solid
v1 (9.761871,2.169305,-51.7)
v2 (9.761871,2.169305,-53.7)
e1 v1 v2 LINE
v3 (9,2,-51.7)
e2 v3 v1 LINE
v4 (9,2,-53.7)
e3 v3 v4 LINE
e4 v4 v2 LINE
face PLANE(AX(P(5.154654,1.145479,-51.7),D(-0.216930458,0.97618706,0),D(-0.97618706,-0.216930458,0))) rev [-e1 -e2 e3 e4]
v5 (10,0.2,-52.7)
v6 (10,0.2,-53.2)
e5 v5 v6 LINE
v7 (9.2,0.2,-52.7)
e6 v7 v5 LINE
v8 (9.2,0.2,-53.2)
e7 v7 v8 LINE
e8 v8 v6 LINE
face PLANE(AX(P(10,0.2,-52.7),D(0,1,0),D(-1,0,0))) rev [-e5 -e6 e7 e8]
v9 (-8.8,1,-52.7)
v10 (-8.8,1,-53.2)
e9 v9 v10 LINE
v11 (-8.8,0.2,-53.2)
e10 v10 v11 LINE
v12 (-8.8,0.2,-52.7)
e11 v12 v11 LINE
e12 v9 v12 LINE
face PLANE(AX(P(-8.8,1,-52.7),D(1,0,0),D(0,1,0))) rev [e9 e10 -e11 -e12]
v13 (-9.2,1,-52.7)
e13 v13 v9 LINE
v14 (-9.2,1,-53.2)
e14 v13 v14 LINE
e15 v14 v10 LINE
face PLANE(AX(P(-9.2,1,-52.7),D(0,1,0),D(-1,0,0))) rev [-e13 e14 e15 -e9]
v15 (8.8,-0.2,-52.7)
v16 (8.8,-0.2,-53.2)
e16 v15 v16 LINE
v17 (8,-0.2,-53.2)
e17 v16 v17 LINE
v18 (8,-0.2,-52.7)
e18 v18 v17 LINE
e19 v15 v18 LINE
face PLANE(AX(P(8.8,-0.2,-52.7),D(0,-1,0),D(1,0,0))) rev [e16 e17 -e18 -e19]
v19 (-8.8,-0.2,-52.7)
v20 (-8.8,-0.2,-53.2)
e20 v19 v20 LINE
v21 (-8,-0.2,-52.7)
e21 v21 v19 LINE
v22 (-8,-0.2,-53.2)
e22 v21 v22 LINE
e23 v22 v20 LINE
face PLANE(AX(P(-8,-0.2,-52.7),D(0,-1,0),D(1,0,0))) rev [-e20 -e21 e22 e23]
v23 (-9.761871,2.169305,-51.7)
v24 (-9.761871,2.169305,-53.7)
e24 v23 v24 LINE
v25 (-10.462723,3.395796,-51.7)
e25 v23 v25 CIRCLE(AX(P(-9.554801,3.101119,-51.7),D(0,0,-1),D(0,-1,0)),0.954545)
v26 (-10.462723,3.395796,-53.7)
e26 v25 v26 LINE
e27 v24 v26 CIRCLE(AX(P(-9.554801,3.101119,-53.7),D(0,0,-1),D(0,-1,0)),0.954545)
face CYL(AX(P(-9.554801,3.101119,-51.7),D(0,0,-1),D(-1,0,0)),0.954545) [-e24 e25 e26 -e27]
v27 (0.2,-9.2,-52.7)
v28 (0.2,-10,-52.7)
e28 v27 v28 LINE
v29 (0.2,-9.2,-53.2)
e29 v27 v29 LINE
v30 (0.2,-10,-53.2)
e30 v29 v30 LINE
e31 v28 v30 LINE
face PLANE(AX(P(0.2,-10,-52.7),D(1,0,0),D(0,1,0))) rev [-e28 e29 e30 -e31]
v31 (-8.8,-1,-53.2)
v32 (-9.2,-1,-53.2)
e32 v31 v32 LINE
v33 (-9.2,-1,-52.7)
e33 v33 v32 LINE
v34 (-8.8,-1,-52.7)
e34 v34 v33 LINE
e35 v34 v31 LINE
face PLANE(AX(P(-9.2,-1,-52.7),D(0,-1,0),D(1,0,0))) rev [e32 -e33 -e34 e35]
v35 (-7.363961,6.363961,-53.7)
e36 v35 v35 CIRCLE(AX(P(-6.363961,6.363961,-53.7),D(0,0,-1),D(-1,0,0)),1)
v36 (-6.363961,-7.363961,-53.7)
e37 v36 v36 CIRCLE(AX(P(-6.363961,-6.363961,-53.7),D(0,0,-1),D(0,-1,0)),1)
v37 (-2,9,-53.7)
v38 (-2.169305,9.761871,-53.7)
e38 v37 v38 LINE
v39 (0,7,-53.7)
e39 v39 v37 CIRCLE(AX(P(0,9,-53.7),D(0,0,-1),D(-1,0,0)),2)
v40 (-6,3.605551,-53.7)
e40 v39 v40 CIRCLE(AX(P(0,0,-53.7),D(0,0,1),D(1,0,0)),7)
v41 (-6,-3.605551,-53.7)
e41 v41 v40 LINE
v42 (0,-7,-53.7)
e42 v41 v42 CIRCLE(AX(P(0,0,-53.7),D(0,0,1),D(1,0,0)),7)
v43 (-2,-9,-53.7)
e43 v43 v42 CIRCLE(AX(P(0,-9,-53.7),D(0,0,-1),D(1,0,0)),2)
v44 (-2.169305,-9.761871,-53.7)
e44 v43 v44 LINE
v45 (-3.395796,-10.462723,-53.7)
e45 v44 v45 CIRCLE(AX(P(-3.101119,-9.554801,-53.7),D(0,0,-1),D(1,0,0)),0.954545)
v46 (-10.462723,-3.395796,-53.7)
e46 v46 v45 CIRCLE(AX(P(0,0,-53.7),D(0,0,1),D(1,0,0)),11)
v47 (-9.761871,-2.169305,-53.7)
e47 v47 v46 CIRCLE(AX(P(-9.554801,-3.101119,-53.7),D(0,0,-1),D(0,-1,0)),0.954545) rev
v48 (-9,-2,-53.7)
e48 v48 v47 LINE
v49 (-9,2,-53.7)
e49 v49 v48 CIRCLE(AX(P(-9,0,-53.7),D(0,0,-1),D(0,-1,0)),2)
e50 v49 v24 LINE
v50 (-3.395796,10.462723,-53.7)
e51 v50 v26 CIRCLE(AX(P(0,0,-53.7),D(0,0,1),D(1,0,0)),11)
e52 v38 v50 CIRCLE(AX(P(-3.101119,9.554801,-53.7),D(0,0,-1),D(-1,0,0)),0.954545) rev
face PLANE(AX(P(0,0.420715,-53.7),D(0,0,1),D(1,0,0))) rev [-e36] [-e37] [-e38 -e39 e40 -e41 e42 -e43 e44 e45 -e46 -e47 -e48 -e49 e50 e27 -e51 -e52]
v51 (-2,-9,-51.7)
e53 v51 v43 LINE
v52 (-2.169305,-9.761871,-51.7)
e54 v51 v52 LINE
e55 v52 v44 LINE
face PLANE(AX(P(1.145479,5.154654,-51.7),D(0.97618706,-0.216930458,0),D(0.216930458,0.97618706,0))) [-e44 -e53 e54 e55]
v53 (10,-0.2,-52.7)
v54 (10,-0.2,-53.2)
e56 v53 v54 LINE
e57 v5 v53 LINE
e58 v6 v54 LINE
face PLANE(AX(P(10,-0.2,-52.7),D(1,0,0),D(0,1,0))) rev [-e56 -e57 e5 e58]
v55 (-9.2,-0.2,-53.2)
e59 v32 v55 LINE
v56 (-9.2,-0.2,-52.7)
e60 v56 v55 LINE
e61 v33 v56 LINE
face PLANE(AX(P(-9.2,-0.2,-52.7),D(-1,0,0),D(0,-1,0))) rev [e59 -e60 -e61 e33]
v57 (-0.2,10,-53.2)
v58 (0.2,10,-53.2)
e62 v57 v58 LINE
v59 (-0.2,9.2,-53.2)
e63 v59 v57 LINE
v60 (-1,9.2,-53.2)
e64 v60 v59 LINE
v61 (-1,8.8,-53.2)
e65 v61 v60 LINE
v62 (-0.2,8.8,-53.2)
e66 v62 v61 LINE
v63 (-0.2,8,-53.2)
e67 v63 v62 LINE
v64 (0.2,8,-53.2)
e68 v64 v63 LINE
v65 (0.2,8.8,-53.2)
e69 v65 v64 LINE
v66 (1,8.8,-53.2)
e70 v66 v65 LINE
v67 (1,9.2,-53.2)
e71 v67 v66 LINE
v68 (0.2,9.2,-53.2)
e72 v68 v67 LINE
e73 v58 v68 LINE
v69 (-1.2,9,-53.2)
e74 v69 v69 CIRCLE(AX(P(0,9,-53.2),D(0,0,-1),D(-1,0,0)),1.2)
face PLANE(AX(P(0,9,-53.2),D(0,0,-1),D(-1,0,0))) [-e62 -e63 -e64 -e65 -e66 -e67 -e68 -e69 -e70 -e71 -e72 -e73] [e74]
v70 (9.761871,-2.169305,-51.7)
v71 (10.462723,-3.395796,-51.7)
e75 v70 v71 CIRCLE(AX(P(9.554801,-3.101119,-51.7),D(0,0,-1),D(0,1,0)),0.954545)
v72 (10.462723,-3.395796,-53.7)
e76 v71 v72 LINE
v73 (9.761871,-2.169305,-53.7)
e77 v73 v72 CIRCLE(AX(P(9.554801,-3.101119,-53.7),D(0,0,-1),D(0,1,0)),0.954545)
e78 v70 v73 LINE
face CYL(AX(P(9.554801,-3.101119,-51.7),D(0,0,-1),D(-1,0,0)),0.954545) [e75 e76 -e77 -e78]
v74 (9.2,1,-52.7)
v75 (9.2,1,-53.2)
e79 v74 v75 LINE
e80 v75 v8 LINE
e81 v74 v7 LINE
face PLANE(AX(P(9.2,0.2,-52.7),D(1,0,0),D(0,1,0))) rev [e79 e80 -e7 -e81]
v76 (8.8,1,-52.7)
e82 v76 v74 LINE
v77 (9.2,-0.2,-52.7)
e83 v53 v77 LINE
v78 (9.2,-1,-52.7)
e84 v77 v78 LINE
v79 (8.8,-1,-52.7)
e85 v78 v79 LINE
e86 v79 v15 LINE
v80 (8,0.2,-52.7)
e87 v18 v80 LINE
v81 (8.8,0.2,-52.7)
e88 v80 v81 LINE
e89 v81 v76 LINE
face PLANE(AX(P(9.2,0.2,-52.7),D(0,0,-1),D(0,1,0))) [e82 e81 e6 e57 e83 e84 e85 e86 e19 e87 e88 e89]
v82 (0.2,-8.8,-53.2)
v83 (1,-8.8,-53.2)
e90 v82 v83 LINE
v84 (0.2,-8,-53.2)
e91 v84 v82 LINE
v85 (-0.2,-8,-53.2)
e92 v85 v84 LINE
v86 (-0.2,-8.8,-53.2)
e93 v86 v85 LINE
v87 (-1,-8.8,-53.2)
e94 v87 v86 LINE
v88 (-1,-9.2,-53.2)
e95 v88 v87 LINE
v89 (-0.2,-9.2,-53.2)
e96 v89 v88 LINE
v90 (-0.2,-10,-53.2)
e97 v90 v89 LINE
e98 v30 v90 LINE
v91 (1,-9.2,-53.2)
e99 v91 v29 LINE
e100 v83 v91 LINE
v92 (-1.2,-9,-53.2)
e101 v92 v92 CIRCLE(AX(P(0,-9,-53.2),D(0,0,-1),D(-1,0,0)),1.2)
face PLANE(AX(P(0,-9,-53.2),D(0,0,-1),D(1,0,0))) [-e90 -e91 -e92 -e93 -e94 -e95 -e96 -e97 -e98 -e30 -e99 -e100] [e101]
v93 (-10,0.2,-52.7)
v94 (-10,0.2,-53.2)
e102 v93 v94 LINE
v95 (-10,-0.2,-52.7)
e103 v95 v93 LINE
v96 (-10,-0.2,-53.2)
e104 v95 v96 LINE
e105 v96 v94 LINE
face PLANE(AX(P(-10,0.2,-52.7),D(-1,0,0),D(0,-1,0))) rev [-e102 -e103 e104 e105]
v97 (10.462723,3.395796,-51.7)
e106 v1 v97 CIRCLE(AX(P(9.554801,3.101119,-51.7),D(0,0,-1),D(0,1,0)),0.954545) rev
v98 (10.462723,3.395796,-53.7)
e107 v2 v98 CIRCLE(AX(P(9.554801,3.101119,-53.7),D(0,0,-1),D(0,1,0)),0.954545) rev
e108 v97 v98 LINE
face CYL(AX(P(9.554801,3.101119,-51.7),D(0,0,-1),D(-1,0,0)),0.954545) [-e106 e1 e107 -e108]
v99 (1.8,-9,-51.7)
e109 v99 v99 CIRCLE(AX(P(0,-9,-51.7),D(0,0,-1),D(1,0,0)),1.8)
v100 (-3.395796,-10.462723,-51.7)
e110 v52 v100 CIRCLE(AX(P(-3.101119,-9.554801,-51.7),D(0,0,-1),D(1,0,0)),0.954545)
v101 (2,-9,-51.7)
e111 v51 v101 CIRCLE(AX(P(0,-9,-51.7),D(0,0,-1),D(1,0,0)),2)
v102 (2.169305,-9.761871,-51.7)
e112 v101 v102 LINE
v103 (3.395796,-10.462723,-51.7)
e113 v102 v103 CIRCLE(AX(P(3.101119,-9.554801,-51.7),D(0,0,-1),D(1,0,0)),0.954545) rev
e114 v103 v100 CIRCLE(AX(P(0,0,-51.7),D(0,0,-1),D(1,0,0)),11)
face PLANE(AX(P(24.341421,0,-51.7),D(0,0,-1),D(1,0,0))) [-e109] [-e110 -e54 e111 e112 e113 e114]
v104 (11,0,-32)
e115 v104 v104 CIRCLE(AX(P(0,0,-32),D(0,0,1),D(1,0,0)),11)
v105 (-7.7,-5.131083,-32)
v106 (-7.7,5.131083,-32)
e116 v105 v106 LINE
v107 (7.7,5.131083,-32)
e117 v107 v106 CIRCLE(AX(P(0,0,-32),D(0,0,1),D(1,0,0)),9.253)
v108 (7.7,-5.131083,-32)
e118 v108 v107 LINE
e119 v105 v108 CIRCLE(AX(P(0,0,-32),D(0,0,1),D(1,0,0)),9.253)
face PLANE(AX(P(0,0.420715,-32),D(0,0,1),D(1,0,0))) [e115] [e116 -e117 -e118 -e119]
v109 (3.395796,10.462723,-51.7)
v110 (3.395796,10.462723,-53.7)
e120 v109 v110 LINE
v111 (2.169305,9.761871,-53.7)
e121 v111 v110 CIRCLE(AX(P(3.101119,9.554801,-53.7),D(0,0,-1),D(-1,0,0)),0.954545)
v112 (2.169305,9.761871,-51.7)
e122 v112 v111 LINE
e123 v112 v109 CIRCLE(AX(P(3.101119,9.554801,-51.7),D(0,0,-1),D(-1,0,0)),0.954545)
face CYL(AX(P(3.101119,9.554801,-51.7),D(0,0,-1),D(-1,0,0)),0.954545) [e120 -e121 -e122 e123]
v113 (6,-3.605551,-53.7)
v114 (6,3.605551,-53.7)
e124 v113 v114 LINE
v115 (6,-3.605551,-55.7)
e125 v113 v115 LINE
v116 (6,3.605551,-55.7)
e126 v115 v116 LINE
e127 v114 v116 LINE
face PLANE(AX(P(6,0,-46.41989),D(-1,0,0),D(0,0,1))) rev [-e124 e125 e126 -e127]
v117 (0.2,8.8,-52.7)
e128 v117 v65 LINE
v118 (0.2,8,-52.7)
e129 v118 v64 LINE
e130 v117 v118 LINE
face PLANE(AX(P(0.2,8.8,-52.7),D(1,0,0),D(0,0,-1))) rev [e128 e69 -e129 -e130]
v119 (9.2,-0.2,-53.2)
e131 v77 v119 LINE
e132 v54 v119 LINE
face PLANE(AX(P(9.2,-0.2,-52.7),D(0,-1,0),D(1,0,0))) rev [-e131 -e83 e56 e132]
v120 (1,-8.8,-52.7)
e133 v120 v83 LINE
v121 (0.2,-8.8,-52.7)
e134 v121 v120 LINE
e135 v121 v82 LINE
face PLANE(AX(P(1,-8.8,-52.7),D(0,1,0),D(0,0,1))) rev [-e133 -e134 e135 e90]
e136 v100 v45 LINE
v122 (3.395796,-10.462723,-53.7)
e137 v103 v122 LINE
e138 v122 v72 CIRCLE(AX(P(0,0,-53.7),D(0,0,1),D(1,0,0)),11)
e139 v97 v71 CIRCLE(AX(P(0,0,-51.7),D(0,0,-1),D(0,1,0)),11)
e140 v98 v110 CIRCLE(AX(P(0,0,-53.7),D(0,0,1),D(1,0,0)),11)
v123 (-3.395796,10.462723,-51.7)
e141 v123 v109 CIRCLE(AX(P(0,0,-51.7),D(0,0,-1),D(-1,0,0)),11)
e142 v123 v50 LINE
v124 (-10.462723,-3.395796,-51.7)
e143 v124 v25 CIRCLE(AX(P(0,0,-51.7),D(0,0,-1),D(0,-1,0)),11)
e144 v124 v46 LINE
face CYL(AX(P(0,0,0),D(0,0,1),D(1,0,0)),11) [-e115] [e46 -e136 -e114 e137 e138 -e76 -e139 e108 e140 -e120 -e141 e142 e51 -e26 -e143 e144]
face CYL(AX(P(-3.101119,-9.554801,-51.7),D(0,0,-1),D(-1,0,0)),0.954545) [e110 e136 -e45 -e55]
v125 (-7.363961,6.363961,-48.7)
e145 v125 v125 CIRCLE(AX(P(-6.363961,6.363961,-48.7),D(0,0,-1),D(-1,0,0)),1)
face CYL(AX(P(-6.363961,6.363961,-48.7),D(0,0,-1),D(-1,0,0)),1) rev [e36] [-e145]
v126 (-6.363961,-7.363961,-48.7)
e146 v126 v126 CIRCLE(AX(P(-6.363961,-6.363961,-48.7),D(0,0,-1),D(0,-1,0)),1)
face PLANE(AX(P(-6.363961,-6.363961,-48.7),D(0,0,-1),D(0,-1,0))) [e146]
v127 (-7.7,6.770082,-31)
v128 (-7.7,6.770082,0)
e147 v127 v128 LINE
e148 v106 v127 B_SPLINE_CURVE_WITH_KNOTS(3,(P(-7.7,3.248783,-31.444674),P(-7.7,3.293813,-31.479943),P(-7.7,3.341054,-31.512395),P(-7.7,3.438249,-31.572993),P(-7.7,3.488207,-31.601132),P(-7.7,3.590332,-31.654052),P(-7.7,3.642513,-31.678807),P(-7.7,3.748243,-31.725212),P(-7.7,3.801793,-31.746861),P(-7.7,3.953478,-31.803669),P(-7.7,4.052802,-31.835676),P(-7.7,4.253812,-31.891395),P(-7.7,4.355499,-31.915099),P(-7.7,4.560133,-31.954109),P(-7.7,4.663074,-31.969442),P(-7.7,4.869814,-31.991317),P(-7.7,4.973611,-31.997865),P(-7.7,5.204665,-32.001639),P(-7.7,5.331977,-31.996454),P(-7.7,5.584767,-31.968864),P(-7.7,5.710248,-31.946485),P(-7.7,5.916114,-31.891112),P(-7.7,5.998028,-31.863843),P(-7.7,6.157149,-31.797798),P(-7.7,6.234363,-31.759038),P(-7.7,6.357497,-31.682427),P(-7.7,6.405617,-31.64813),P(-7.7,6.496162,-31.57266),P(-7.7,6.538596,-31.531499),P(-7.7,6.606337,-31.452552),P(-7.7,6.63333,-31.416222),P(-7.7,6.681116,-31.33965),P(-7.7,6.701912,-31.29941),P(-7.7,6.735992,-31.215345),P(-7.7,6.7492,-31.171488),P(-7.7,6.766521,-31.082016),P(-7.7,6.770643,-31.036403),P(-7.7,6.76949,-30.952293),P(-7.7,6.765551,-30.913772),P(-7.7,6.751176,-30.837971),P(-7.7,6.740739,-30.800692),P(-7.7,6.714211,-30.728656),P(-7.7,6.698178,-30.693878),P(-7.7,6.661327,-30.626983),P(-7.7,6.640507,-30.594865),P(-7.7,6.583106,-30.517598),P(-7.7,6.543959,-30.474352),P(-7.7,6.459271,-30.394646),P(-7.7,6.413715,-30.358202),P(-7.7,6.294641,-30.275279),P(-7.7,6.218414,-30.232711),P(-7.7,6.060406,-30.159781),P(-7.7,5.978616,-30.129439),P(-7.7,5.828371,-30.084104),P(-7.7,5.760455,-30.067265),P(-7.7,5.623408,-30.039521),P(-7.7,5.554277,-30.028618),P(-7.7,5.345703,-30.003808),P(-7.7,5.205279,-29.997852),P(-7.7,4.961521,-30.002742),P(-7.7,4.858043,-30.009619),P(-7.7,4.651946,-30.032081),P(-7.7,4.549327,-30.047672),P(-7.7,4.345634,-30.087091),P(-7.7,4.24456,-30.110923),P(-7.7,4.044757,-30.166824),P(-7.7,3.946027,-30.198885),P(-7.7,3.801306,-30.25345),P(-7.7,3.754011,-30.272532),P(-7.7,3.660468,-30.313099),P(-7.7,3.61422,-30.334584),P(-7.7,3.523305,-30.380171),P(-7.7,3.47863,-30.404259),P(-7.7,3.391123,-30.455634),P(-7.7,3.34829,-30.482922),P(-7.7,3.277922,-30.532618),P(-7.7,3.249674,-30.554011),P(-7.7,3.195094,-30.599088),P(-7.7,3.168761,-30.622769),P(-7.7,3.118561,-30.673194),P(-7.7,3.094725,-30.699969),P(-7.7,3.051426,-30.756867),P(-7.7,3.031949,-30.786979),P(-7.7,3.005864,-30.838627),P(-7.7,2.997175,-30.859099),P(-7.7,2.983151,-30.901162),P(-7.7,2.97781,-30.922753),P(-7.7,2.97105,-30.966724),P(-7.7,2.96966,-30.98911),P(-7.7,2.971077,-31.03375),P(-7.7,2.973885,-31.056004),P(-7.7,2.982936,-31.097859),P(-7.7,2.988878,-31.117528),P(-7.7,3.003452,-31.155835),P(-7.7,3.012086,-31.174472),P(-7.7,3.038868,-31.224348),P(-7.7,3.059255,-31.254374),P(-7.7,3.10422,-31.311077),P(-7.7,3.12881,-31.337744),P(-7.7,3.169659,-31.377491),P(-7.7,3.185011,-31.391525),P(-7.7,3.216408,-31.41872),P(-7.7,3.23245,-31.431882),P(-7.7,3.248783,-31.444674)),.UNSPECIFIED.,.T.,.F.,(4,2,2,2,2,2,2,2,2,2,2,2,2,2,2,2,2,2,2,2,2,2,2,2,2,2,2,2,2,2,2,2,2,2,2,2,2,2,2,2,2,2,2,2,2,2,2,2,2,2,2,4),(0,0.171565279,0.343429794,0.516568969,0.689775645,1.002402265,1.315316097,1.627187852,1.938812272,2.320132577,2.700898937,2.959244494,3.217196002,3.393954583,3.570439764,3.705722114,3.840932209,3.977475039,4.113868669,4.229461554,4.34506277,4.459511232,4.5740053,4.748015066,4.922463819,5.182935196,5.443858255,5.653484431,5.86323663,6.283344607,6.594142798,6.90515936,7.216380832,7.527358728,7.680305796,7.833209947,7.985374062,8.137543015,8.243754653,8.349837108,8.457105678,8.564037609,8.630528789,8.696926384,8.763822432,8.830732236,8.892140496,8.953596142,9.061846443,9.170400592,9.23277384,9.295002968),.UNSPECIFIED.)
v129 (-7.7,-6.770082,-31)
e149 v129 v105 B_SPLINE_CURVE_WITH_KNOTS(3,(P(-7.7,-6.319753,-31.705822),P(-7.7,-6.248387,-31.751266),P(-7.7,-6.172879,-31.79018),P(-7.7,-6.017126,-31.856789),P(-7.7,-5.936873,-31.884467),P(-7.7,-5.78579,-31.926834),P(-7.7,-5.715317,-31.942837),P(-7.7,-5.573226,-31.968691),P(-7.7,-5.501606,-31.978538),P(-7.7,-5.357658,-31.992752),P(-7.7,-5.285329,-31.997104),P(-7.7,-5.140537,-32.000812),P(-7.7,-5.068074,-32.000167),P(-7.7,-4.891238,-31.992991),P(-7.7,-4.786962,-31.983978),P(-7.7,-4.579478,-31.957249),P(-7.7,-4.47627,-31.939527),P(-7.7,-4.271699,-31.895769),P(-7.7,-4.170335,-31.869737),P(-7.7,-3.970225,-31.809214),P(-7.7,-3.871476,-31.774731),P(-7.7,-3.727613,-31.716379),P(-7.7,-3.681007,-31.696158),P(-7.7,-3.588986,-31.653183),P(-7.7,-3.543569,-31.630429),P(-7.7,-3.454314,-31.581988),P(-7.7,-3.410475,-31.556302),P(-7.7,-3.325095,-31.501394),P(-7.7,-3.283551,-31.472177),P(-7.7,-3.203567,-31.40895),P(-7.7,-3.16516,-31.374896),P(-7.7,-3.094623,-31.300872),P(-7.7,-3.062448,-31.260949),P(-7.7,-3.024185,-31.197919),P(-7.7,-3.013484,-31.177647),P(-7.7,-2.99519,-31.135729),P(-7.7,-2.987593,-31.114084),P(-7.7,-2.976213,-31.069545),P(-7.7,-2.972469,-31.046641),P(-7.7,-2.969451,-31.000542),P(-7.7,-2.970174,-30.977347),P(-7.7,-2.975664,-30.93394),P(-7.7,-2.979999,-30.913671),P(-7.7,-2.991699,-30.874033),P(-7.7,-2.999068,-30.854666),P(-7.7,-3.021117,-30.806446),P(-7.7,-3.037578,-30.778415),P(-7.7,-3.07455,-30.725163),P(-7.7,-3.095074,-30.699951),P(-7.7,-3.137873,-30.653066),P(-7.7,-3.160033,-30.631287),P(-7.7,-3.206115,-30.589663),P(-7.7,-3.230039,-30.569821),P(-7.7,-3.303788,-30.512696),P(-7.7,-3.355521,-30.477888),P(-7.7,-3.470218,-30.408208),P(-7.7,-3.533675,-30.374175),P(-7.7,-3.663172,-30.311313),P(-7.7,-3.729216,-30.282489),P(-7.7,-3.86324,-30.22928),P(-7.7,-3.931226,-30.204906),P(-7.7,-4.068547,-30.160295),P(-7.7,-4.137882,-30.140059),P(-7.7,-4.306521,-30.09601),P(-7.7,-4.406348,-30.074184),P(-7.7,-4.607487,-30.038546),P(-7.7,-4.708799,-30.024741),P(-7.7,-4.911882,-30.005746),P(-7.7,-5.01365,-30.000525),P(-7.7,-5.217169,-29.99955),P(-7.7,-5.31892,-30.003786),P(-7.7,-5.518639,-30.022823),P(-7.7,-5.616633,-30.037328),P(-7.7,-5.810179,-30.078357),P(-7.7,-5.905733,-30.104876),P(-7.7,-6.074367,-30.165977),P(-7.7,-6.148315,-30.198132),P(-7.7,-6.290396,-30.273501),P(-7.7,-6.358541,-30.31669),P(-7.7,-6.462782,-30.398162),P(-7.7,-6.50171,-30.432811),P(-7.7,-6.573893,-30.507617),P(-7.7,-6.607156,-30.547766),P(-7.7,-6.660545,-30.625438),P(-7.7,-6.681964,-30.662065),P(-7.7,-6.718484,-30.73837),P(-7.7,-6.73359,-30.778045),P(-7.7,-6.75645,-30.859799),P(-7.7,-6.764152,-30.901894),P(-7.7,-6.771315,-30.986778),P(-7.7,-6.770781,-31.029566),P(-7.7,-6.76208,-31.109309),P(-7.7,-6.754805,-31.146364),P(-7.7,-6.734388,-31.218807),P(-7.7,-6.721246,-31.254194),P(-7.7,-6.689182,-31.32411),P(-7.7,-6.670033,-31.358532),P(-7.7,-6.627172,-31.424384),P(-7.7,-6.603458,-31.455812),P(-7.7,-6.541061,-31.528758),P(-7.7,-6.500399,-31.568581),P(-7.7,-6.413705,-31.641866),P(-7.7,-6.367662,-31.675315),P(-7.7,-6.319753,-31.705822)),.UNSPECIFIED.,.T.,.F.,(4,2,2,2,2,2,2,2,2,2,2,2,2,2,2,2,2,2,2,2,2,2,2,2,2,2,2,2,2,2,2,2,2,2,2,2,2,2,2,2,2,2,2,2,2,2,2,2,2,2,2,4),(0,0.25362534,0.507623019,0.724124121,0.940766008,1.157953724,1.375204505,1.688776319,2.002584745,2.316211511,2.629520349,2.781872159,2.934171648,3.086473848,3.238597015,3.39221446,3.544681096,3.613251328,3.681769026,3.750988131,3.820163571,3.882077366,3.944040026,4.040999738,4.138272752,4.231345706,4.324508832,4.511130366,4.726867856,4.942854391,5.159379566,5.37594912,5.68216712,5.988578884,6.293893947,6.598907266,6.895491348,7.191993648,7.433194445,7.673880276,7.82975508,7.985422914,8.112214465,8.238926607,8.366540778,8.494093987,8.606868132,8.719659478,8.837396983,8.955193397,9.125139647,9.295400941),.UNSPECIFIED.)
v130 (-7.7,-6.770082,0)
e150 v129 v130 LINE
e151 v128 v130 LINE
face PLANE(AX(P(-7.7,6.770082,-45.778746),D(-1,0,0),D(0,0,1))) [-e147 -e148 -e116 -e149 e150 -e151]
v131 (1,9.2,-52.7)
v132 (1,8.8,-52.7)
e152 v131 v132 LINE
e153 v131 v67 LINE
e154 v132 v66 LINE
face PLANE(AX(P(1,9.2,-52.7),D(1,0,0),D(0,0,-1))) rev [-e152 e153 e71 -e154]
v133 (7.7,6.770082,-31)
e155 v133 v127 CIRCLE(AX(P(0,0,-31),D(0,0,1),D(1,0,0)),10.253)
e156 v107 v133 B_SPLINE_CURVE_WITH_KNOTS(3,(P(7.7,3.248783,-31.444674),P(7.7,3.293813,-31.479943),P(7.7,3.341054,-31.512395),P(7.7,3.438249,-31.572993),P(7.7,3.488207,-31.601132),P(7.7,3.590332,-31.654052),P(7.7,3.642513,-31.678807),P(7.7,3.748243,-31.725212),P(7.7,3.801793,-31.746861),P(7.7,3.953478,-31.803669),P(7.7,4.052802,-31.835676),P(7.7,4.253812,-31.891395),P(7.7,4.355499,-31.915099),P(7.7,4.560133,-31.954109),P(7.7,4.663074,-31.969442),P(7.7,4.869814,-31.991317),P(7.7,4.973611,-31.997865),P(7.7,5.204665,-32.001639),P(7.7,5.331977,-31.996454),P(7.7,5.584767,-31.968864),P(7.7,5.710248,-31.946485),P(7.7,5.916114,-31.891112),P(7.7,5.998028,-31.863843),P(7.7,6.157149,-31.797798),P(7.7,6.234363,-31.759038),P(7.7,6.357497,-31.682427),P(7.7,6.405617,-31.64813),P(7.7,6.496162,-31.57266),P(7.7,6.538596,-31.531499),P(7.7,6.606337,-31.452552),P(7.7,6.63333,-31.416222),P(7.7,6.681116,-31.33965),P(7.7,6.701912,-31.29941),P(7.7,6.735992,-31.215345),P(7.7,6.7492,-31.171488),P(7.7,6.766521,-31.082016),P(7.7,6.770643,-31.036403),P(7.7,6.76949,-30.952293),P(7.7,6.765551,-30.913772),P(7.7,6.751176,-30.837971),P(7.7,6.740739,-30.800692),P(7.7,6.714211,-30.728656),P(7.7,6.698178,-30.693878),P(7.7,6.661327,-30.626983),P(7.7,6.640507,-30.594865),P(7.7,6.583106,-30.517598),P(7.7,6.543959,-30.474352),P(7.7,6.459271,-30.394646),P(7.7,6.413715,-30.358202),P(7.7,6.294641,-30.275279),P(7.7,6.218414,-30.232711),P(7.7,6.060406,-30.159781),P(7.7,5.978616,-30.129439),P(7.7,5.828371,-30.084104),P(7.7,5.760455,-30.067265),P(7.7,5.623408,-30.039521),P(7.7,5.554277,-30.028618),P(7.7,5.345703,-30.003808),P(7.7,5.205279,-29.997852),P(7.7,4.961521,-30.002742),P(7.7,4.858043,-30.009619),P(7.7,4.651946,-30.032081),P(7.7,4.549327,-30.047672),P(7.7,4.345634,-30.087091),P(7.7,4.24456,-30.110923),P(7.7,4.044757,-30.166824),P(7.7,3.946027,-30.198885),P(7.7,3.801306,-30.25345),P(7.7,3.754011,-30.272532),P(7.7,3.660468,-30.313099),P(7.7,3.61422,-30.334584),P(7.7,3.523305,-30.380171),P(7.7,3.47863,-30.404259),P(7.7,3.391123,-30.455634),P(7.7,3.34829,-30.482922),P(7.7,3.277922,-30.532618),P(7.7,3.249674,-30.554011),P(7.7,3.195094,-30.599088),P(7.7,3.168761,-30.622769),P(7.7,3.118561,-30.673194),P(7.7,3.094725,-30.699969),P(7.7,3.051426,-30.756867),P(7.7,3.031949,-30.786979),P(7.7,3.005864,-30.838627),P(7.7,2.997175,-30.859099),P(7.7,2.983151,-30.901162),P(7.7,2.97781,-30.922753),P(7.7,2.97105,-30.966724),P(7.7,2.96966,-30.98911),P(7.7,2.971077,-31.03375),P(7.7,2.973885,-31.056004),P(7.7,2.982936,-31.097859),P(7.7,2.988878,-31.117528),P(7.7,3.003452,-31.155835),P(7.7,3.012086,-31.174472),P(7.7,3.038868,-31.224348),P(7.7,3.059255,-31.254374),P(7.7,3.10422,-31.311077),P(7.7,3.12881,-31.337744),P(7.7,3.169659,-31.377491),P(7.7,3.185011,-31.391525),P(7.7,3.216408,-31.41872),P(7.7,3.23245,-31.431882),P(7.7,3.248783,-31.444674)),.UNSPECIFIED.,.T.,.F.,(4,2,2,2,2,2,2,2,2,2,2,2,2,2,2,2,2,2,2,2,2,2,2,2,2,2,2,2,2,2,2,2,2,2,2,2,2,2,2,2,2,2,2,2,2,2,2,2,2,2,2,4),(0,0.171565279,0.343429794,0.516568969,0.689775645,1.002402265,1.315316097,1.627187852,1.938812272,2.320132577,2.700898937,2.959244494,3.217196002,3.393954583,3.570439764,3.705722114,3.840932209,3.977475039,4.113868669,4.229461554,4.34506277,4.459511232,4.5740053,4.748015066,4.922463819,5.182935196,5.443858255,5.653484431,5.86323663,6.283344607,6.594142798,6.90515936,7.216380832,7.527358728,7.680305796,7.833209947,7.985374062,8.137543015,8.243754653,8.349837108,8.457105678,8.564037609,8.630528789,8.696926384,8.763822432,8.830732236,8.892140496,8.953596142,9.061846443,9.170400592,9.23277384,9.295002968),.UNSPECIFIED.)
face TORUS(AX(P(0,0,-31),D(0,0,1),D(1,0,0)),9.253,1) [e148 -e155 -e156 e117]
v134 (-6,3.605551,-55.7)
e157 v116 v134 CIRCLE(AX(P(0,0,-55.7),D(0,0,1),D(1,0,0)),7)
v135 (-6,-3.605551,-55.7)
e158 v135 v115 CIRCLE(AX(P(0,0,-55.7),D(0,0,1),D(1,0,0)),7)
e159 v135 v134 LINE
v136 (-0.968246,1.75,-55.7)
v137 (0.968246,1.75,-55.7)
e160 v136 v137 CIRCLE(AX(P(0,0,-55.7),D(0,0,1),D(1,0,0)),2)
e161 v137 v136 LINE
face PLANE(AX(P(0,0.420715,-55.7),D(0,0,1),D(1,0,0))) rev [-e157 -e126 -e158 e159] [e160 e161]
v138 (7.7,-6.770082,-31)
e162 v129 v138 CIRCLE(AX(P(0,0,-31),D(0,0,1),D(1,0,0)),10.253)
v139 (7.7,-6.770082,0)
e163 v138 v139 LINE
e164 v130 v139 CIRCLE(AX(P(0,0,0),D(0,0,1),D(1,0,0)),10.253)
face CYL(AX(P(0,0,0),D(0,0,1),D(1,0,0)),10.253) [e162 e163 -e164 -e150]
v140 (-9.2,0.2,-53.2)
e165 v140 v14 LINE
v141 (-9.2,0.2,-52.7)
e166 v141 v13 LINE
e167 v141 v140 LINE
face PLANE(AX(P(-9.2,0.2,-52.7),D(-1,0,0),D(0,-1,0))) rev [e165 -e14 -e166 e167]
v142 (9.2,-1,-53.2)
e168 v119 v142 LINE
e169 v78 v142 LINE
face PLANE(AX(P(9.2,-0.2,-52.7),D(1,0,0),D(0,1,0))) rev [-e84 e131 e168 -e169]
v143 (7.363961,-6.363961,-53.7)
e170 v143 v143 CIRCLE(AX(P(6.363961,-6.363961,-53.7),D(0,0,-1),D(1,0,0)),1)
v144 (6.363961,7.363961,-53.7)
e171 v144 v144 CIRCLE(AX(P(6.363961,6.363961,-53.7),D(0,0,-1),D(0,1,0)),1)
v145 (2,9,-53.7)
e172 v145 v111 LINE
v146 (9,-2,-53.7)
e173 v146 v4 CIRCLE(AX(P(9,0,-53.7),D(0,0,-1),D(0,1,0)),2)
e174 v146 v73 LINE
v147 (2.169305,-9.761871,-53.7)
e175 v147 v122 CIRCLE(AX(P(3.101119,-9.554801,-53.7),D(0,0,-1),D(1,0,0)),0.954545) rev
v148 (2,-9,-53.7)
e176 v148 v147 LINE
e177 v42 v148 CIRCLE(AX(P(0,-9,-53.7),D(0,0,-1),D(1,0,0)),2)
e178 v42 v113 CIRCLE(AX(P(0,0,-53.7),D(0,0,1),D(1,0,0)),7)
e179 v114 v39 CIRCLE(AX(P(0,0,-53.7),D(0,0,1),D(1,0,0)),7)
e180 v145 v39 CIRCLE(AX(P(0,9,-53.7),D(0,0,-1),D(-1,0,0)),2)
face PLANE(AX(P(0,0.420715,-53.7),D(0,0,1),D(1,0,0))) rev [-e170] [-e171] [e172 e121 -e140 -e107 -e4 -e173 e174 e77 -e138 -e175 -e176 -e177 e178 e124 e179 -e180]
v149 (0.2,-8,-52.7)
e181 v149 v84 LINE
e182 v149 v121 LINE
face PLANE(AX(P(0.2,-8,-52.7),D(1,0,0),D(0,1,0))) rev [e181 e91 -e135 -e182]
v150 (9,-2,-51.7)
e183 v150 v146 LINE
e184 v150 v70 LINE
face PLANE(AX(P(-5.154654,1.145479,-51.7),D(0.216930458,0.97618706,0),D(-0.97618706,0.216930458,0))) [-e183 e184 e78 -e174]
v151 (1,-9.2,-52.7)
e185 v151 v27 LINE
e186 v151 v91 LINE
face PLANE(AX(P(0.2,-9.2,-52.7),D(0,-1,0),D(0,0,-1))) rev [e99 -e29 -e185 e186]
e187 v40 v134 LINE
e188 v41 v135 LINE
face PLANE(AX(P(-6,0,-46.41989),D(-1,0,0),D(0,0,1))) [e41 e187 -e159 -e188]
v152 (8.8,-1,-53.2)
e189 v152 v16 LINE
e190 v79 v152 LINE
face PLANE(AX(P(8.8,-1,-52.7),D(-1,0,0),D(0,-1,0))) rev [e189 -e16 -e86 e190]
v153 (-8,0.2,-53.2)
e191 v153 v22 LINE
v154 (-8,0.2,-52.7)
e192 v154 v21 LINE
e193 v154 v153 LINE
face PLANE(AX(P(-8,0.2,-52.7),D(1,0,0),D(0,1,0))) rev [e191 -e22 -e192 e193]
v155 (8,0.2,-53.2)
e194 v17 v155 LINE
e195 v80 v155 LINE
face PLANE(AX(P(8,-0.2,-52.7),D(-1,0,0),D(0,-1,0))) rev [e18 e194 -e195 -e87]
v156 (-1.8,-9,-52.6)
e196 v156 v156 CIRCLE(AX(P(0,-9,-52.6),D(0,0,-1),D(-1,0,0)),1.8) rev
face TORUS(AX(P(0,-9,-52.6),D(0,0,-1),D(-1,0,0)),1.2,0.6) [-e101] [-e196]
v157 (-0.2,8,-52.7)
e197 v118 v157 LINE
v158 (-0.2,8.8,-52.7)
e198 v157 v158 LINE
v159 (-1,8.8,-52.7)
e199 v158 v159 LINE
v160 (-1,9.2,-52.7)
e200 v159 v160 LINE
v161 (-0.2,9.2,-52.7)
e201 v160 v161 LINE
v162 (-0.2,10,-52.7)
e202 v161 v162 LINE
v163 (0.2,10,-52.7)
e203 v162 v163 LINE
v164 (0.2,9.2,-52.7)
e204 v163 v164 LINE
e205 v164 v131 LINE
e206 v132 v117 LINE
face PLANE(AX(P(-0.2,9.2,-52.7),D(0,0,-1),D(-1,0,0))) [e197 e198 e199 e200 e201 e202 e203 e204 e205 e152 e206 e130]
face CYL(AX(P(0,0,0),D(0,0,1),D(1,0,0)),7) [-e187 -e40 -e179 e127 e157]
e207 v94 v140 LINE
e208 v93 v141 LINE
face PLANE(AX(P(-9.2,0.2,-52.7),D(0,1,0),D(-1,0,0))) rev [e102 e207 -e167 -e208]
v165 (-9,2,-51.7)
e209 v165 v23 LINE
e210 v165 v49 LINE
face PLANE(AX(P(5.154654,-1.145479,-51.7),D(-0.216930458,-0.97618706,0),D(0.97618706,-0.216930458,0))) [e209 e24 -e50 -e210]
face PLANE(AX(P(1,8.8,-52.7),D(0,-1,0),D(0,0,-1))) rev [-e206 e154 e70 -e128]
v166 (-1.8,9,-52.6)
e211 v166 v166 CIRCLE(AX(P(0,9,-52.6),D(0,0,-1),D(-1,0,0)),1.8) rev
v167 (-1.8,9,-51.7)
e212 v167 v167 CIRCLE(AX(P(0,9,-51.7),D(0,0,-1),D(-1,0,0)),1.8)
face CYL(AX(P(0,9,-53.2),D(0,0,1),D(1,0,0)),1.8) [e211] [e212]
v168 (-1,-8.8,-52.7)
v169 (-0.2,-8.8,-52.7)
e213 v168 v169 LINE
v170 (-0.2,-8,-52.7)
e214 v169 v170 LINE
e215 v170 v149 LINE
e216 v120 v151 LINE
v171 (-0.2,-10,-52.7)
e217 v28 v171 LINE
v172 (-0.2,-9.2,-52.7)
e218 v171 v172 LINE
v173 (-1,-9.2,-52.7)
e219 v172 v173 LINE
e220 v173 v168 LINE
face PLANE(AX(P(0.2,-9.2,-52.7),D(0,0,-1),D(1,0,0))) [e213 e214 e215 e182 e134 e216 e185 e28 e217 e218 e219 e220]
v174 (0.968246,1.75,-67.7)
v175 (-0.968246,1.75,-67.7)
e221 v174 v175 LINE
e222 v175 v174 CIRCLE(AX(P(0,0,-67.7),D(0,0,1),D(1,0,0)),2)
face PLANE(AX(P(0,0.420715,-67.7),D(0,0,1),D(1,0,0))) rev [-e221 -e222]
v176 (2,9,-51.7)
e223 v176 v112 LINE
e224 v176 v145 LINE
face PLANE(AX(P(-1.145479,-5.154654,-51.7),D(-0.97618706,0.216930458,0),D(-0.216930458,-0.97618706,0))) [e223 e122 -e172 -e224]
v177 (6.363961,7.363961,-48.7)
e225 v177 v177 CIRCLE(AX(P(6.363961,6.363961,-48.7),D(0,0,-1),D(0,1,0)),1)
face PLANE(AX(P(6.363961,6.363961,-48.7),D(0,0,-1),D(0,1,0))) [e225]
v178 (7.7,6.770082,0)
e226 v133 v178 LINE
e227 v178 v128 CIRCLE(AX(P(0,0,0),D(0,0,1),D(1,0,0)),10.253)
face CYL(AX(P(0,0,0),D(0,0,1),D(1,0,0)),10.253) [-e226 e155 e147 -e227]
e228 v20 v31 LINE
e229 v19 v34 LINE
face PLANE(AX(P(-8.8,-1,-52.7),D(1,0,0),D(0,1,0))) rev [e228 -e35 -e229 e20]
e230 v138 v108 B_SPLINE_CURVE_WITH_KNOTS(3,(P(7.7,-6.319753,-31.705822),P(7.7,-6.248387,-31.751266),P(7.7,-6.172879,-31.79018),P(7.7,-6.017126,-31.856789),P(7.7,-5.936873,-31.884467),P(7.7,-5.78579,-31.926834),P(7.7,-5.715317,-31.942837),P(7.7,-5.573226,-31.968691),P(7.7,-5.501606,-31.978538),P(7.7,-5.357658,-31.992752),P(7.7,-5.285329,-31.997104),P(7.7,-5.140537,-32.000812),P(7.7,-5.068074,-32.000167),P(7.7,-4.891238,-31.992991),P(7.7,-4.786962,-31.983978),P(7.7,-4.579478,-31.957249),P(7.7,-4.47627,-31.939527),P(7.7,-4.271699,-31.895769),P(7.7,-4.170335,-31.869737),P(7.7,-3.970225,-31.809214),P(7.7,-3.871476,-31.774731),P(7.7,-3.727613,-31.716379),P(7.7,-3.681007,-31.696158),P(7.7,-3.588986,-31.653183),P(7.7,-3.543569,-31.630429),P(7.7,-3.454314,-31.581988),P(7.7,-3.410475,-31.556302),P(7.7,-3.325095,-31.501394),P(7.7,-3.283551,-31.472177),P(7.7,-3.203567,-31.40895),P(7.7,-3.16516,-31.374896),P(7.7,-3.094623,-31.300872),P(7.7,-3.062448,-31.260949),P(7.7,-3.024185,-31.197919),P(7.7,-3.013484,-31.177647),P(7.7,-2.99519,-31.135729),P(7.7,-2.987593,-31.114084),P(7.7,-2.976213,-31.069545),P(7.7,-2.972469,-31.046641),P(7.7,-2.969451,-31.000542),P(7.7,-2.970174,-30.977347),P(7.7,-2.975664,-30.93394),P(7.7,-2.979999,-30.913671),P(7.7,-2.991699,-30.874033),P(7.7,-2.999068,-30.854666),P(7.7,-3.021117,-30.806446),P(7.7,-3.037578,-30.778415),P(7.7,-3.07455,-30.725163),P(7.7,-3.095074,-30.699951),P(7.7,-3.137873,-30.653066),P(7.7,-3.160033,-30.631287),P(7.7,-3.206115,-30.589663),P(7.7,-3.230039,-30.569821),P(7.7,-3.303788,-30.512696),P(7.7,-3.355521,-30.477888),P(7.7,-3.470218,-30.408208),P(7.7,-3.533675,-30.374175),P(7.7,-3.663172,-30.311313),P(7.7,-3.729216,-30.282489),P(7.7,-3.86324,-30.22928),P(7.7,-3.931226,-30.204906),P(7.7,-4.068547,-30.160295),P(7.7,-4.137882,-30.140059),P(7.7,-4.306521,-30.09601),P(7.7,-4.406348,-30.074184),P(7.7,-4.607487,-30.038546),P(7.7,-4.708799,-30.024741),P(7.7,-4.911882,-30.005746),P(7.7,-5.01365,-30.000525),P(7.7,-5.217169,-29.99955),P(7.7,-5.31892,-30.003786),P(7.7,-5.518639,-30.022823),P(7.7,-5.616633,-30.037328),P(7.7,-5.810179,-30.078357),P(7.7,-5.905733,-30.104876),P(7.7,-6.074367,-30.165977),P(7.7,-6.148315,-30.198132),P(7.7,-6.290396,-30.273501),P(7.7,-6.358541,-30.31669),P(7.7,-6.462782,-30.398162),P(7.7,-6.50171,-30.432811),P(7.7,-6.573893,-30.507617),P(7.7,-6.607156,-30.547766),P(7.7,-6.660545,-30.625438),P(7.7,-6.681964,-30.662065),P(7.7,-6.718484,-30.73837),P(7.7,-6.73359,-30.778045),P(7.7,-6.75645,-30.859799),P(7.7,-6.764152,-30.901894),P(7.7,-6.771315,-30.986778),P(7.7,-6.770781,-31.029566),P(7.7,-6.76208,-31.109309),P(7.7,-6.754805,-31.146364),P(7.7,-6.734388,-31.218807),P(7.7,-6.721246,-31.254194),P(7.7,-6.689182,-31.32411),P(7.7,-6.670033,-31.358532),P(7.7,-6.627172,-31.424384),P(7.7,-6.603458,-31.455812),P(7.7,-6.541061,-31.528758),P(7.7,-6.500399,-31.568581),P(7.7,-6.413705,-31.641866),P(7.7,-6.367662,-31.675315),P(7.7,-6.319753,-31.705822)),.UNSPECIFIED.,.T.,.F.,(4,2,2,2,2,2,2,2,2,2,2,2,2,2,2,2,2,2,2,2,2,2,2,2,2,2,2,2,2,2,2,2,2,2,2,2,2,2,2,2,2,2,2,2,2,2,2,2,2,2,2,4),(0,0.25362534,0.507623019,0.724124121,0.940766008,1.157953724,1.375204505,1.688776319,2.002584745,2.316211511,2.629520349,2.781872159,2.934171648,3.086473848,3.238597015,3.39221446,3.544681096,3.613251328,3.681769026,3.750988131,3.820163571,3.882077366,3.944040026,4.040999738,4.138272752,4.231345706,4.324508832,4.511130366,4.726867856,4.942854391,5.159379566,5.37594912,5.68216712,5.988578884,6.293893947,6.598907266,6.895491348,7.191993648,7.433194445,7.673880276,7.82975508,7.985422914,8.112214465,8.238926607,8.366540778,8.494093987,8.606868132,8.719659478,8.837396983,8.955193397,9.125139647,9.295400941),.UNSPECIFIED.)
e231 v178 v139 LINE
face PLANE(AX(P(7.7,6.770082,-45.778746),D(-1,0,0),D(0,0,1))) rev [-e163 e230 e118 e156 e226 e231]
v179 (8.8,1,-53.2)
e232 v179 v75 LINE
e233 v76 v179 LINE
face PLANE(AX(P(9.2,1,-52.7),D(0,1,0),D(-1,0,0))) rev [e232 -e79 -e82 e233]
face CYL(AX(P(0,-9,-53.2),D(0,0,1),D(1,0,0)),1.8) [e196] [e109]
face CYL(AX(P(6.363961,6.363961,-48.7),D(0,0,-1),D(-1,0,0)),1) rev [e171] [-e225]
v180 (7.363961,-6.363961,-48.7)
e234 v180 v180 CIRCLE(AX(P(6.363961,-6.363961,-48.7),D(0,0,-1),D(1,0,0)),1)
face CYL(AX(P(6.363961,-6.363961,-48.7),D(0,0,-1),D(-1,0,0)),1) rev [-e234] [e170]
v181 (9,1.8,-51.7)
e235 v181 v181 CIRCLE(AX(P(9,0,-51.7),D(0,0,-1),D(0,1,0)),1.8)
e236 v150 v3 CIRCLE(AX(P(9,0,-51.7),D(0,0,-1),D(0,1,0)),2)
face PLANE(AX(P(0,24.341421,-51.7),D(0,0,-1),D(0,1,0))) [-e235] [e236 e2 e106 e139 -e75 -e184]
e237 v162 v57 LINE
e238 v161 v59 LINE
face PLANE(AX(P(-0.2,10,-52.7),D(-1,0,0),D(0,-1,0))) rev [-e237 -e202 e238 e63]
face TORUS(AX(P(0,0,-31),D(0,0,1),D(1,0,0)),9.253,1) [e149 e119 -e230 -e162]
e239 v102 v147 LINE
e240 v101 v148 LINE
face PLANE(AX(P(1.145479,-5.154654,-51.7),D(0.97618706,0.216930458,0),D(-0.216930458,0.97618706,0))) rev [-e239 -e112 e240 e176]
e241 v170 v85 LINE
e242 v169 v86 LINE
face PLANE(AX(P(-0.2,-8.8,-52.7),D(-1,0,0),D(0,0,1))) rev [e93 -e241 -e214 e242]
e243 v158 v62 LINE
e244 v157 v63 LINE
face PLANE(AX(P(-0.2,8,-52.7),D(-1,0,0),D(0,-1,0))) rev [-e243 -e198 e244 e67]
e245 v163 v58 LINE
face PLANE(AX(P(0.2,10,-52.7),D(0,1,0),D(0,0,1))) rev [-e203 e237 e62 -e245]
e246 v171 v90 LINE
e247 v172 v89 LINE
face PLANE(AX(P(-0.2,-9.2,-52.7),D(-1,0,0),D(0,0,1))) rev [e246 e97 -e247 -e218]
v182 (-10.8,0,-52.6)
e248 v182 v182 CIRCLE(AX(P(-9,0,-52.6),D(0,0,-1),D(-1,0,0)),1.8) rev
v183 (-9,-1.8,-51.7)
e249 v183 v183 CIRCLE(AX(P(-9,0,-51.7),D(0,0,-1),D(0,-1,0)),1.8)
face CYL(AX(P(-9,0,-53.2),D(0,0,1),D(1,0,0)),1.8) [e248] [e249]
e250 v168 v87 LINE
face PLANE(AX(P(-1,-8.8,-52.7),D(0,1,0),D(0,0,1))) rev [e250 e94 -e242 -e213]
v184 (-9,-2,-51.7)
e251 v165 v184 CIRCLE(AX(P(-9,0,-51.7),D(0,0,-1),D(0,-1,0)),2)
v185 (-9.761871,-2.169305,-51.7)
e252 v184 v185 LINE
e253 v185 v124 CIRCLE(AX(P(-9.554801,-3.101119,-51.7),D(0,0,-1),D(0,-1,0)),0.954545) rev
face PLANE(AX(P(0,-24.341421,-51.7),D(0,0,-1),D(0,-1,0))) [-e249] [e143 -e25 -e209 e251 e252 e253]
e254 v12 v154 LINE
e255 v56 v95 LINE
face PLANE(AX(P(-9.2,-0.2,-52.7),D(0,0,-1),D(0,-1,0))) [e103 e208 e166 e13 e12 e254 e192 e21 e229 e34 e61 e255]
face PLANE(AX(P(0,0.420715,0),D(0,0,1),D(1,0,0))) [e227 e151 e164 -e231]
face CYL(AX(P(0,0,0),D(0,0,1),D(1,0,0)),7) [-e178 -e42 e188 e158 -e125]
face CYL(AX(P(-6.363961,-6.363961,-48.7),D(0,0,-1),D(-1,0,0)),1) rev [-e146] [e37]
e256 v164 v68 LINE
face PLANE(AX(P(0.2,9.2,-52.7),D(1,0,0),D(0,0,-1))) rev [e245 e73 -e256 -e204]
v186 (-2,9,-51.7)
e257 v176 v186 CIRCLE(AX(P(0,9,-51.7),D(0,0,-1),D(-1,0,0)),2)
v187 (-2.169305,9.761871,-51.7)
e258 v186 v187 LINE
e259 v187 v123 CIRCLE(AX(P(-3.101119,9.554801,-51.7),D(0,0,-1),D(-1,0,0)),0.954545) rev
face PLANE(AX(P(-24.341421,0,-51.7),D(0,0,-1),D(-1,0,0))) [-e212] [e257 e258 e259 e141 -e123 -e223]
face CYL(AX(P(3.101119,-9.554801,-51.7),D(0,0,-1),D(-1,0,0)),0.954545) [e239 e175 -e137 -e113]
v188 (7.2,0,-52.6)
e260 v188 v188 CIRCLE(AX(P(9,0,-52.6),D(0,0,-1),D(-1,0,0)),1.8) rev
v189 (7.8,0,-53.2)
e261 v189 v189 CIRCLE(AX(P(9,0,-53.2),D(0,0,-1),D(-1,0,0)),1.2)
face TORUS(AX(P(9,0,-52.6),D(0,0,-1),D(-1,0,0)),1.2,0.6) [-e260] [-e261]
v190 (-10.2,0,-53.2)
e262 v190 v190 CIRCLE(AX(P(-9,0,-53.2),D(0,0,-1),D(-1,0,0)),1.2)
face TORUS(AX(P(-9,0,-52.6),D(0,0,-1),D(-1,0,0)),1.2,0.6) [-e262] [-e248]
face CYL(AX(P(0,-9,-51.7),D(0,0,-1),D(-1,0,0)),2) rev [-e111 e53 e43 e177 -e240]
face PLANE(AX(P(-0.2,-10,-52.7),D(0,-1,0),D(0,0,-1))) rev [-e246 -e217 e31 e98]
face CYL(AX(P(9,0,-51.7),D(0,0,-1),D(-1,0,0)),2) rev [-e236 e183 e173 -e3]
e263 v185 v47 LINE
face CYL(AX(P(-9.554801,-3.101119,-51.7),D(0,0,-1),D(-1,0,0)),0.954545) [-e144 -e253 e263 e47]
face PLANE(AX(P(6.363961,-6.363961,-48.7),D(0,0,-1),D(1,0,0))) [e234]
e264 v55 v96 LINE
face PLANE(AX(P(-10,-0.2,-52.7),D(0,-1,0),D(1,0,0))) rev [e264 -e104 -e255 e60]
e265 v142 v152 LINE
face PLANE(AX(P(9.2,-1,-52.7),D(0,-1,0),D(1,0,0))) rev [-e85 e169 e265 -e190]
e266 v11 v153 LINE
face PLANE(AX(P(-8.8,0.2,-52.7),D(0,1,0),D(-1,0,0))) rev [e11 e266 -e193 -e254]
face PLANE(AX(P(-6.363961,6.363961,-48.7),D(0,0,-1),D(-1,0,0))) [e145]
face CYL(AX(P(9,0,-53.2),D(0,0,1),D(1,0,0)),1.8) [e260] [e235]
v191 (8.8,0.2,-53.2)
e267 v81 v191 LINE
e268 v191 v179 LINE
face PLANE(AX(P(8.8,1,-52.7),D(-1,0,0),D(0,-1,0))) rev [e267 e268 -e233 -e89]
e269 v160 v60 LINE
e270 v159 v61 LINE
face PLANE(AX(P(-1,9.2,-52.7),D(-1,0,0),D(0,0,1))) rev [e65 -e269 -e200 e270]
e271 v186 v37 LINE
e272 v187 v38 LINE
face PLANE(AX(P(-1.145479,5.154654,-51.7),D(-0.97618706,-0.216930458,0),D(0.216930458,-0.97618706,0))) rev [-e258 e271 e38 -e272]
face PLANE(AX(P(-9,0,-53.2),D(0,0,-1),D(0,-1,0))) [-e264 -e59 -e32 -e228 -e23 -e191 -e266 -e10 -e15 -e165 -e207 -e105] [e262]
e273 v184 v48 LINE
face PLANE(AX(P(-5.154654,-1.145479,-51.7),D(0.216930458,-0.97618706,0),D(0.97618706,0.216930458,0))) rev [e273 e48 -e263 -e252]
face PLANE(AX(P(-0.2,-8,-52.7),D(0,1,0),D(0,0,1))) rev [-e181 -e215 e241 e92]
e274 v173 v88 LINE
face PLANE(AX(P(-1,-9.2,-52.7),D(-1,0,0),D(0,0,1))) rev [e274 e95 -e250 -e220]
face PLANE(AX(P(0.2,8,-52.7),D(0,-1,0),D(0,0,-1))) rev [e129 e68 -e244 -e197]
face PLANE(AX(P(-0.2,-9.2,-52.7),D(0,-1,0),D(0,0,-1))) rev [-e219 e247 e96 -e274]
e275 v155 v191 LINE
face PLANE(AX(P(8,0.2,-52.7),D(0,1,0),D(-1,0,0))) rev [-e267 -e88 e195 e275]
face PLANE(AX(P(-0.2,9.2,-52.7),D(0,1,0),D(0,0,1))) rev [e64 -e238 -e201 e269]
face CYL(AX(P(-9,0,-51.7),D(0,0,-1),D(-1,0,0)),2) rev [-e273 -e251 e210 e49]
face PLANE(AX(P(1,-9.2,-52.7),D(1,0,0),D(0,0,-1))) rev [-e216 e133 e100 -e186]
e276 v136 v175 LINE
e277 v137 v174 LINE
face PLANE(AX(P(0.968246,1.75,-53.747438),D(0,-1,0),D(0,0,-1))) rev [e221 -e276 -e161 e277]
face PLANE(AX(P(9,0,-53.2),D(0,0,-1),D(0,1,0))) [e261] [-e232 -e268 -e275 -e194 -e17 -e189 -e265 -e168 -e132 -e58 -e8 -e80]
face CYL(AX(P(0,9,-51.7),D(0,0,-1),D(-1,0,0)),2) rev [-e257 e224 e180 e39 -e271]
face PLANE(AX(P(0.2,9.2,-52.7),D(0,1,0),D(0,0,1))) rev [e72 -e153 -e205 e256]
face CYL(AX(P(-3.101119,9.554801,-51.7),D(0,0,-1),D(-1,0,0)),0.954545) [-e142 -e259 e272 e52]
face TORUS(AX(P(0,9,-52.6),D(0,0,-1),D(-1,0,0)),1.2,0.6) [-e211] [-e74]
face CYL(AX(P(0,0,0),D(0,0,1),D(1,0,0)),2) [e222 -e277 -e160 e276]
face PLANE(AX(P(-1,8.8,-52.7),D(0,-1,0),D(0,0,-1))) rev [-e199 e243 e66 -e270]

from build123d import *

# Parameters (mm, degrees)
ENL_V_MAT_EXTRU_1_REACH            = 71.464
ENL_V_START                        = -2
ENL_V_MAT_EXTRU_2_DEPTH            = 2
ENL_V_START_2                      = -12
ENL_V_MAT_EXTRU_3_DEPTH            = 12
ENL_V_MAT_EXTRU_4_DEPTH            = 2
ESQUISSE12_R                       = 1.8
BOSS_EXTRU_2_DEPTH                 = 1.5
CONG_1_R                           = 0.6
ENL_V_MAT_EXTRU_6_DEPTH            = 0.5
R_P_TITION_CIRCULAIRE1_COUNT       = 4
CONG_1_OF_R_P_TITION_CIRCULAIRE1_R = 0.6
ESQUISSE18_R                       = 1
ENL_V_MAT_EXTRU_7_DEPTH            = 5
R_P_TITION_CIRCULAIRE2_COUNT       = 4


# Read off the part's stored shape, not the designer's step: Révolution2
with BuildPart() as part:
    # Révolution2 outline → Révolution2 (revolve)
    with BuildSketch(Plane.XZ):
        with BuildLine():
            ThreePointArc((9.253, -32), (9.960106781, -31.707106781), (10.253, -31))
            Line((10.253, -31), (10.253, 0))
            Line((10.253, 0), (0, 0))
            Line((0, 0), (0, -67.7))
            Line((0, -67.7), (2, -67.7))
            Line((2, -67.7), (2, -55.7))
            Line((2, -55.7), (7, -55.7))
            Line((7, -55.7), (7, -53.7))
            Line((7, -53.7), (11, -53.7))
            Line((11, -53.7), (11, -32))
            Line((11, -32), (9.253, -32))
        make_face()
    revolve(axis=Axis((0, 0, 0), (0, 0, 1)))

    # Enlèv. mat.-Extru.1: up to this face of the body (flat: up to its plane)
    enl_v_mat_extru_1_end = Plane(part.part.faces().sort_by_distance((-10.688873016, 0, -32))[0])
    # Esquisse4 → Enlèv. mat.-Extru.1 (cut, up to the picked face)
    with BuildSketch(Plane.XY, mode=Mode.PRIVATE) as enl_v_mat_extru_1_sk1:
        with BuildLine():
            Line((7.7, 6.770081905), (7.7, -6.770081905))
            ThreePointArc((7.7, -6.770081905), (10.253, 0), (7.7, 6.770081905))
        make_face()
    enl_v_mat_extru_1_tool1 = split(extrude(enl_v_mat_extru_1_sk1.sketch, amount=-ENL_V_MAT_EXTRU_1_REACH, mode=Mode.PRIVATE), bisect_by=enl_v_mat_extru_1_end, keep=Keep.BOTH, mode=Mode.PRIVATE)
    enl_v_mat_extru_1 = enl_v_mat_extru_1_tool1.solids().sort_by(Axis((8.732948, 0, 0), (0, 0, -1)))[0]
    add(enl_v_mat_extru_1, mode=Mode.SUBTRACT)

    # Esquisse5 → Enlèv. mat.-Extru.2 (cut)
    with BuildSketch(Plane(origin=(0, 0, -55.7), x_dir=(-1, 0, 0), z_dir=(0, 0, -1)).offset(ENL_V_START)):
        with BuildLine():
            Line((-6, -3.605551275), (-6, 3.605551275))
            ThreePointArc((-6, 3.605551275), (-7, 0), (-6, -3.605551275))
        make_face()
    enl_v_mat_extru_2 = extrude(amount=ENL_V_MAT_EXTRU_2_DEPTH, mode=Mode.SUBTRACT)

    # Symétrie1: Enlèv. mat.-Extru.1, Enlèv. mat.-Extru.2 across plane
    add(enl_v_mat_extru_1.mirror(Plane(origin=(0, 0, 0), x_dir=(0, 0, 1), z_dir=(1, 0, 0))), mode=Mode.SUBTRACT)
    add(enl_v_mat_extru_2.mirror(Plane(origin=(0, 0, 0), x_dir=(0, 0, 1), z_dir=(1, 0, 0))), mode=Mode.SUBTRACT)

    # Esquisse6 → Enlèv. mat.-Extru.3 (cut)
    with BuildSketch(Plane(origin=(0, 0, -67.7), x_dir=(-1, 0, 0), z_dir=(0, 0, -1)).offset(ENL_V_START_2)):
        with BuildLine():
            Line((-0.968245837, 1.75), (0.968245837, 1.75))
            ThreePointArc((0.968245837, 1.75), (0, 2), (-0.968245837, 1.75))
        make_face()
    extrude(amount=ENL_V_MAT_EXTRU_3_DEPTH, mode=Mode.SUBTRACT)

    # Esquisse7 → Enlèv. mat.-Extru.4 (cut)
    with BuildSketch(Plane(origin=(0, 0, -53.7), x_dir=(-1, 0, 0), z_dir=(0, 0, -1)).offset(ENL_V_START)):
        with BuildLine():
            Line((-2, 9), (-2.169304578, 9.761870602))
            ThreePointArc((-2.169304578, 9.761870602), (-2.627532331, 10.383578164), (-3.395796013, 10.46272285))
            ThreePointArc((-3.395796013, 10.46272285), (0, 11), (3.395796013, 10.46272285))
            ThreePointArc((3.395796013, 10.46272285), (2.627532331, 10.383578164), (2.169304578, 9.761870602))
            Line((2.169304578, 9.761870602), (2, 9))
            ThreePointArc((2, 9), (0, 7), (-2, 9))
        make_face()
    enl_v_mat_extru_4 = extrude(amount=ENL_V_MAT_EXTRU_4_DEPTH, mode=Mode.SUBTRACT)

    # Esquisse12 → Boss.-Extru.2 (add)
    with BuildSketch(Plane(origin=(0, 0, -51.7), x_dir=(-1, 0, 0), z_dir=(0, 0, -1))):
        with Locations((0, 9)):
            Circle(ESQUISSE12_R)
    boss_extru_2 = extrude(amount=BOSS_EXTRU_2_DEPTH)

    # Congé1
    cong_1_edges = [part.edges().sort_by_distance(p)[0] for p in [
        (1.8, 9, -53.2),
    ]]
    fillet(cong_1_edges, radius=CONG_1_R)

    # Esquisse13 → Enlèv. mat.-Extru.6 (cut)
    with BuildSketch(Plane(origin=(0, 0, -53.2), x_dir=(-1, 0, 0), z_dir=(0, 0, -1))):
        Polygon((-0.2, 9.2), (-0.2, 10), (0.2, 10), (0.2, 9.2), (1, 9.2), (1, 8.8), (0.2, 8.8), (0.2, 8), (-0.2, 8), (-0.2, 8.8), (-1, 8.8), (-1, 9.2), align=None)
    enl_v_mat_extru_6 = extrude(amount=-ENL_V_MAT_EXTRU_6_DEPTH, mode=Mode.SUBTRACT)

    # Répétition circulaire1: Enlèv. mat.-Extru.4, Boss.-Extru.2, Enlèv. mat.-Extru.6 ×4 about axis
    r_p_tition_circulaire1_axis = Axis((0, 0, 0), (0, 0, 1))
    add([enl_v_mat_extru_4.rotate(r_p_tition_circulaire1_axis, i * 360 / R_P_TITION_CIRCULAIRE1_COUNT) for i in range(1, R_P_TITION_CIRCULAIRE1_COUNT)], mode=Mode.SUBTRACT)
    add([boss_extru_2.rotate(r_p_tition_circulaire1_axis, i * 360 / R_P_TITION_CIRCULAIRE1_COUNT) for i in range(1, R_P_TITION_CIRCULAIRE1_COUNT)])
    add([enl_v_mat_extru_6.rotate(r_p_tition_circulaire1_axis, i * 360 / R_P_TITION_CIRCULAIRE1_COUNT) for i in range(1, R_P_TITION_CIRCULAIRE1_COUNT)], mode=Mode.SUBTRACT)

    # Congé1 of Répétition circulaire1
    cong_1_of_r_p_tition_circulaire1_edges = [part.edges().sort_by_distance(p)[0] for p in [
        (-9, 1.8, -53.2),
        (-1.8, -9, -53.2),
        (9, -1.8, -53.2),
    ]]
    fillet(cong_1_of_r_p_tition_circulaire1_edges, radius=CONG_1_OF_R_P_TITION_CIRCULAIRE1_R)

    # Esquisse18 → Enlèv. mat.-Extru.7 (cut)
    with BuildSketch(Plane(origin=(0, 0, -53.7), x_dir=(-1, 0, 0), z_dir=(0, 0, -1))):
        with Locations((6.363961031, 6.363961031)):
            Circle(ESQUISSE18_R)
    enl_v_mat_extru_7 = extrude(amount=-ENL_V_MAT_EXTRU_7_DEPTH, mode=Mode.SUBTRACT)

    # Répétition circulaire2: Enlèv. mat.-Extru.7 ×4 about axis
    r_p_tition_circulaire2_axis = Axis((0, 0, 0), (0, 0, 1))
    for i in range(1, R_P_TITION_CIRCULAIRE2_COUNT):
        add(enl_v_mat_extru_7.rotate(r_p_tition_circulaire2_axis, i * 360 / R_P_TITION_CIRCULAIRE2_COUNT), mode=Mode.SUBTRACT)


solid = part.part
